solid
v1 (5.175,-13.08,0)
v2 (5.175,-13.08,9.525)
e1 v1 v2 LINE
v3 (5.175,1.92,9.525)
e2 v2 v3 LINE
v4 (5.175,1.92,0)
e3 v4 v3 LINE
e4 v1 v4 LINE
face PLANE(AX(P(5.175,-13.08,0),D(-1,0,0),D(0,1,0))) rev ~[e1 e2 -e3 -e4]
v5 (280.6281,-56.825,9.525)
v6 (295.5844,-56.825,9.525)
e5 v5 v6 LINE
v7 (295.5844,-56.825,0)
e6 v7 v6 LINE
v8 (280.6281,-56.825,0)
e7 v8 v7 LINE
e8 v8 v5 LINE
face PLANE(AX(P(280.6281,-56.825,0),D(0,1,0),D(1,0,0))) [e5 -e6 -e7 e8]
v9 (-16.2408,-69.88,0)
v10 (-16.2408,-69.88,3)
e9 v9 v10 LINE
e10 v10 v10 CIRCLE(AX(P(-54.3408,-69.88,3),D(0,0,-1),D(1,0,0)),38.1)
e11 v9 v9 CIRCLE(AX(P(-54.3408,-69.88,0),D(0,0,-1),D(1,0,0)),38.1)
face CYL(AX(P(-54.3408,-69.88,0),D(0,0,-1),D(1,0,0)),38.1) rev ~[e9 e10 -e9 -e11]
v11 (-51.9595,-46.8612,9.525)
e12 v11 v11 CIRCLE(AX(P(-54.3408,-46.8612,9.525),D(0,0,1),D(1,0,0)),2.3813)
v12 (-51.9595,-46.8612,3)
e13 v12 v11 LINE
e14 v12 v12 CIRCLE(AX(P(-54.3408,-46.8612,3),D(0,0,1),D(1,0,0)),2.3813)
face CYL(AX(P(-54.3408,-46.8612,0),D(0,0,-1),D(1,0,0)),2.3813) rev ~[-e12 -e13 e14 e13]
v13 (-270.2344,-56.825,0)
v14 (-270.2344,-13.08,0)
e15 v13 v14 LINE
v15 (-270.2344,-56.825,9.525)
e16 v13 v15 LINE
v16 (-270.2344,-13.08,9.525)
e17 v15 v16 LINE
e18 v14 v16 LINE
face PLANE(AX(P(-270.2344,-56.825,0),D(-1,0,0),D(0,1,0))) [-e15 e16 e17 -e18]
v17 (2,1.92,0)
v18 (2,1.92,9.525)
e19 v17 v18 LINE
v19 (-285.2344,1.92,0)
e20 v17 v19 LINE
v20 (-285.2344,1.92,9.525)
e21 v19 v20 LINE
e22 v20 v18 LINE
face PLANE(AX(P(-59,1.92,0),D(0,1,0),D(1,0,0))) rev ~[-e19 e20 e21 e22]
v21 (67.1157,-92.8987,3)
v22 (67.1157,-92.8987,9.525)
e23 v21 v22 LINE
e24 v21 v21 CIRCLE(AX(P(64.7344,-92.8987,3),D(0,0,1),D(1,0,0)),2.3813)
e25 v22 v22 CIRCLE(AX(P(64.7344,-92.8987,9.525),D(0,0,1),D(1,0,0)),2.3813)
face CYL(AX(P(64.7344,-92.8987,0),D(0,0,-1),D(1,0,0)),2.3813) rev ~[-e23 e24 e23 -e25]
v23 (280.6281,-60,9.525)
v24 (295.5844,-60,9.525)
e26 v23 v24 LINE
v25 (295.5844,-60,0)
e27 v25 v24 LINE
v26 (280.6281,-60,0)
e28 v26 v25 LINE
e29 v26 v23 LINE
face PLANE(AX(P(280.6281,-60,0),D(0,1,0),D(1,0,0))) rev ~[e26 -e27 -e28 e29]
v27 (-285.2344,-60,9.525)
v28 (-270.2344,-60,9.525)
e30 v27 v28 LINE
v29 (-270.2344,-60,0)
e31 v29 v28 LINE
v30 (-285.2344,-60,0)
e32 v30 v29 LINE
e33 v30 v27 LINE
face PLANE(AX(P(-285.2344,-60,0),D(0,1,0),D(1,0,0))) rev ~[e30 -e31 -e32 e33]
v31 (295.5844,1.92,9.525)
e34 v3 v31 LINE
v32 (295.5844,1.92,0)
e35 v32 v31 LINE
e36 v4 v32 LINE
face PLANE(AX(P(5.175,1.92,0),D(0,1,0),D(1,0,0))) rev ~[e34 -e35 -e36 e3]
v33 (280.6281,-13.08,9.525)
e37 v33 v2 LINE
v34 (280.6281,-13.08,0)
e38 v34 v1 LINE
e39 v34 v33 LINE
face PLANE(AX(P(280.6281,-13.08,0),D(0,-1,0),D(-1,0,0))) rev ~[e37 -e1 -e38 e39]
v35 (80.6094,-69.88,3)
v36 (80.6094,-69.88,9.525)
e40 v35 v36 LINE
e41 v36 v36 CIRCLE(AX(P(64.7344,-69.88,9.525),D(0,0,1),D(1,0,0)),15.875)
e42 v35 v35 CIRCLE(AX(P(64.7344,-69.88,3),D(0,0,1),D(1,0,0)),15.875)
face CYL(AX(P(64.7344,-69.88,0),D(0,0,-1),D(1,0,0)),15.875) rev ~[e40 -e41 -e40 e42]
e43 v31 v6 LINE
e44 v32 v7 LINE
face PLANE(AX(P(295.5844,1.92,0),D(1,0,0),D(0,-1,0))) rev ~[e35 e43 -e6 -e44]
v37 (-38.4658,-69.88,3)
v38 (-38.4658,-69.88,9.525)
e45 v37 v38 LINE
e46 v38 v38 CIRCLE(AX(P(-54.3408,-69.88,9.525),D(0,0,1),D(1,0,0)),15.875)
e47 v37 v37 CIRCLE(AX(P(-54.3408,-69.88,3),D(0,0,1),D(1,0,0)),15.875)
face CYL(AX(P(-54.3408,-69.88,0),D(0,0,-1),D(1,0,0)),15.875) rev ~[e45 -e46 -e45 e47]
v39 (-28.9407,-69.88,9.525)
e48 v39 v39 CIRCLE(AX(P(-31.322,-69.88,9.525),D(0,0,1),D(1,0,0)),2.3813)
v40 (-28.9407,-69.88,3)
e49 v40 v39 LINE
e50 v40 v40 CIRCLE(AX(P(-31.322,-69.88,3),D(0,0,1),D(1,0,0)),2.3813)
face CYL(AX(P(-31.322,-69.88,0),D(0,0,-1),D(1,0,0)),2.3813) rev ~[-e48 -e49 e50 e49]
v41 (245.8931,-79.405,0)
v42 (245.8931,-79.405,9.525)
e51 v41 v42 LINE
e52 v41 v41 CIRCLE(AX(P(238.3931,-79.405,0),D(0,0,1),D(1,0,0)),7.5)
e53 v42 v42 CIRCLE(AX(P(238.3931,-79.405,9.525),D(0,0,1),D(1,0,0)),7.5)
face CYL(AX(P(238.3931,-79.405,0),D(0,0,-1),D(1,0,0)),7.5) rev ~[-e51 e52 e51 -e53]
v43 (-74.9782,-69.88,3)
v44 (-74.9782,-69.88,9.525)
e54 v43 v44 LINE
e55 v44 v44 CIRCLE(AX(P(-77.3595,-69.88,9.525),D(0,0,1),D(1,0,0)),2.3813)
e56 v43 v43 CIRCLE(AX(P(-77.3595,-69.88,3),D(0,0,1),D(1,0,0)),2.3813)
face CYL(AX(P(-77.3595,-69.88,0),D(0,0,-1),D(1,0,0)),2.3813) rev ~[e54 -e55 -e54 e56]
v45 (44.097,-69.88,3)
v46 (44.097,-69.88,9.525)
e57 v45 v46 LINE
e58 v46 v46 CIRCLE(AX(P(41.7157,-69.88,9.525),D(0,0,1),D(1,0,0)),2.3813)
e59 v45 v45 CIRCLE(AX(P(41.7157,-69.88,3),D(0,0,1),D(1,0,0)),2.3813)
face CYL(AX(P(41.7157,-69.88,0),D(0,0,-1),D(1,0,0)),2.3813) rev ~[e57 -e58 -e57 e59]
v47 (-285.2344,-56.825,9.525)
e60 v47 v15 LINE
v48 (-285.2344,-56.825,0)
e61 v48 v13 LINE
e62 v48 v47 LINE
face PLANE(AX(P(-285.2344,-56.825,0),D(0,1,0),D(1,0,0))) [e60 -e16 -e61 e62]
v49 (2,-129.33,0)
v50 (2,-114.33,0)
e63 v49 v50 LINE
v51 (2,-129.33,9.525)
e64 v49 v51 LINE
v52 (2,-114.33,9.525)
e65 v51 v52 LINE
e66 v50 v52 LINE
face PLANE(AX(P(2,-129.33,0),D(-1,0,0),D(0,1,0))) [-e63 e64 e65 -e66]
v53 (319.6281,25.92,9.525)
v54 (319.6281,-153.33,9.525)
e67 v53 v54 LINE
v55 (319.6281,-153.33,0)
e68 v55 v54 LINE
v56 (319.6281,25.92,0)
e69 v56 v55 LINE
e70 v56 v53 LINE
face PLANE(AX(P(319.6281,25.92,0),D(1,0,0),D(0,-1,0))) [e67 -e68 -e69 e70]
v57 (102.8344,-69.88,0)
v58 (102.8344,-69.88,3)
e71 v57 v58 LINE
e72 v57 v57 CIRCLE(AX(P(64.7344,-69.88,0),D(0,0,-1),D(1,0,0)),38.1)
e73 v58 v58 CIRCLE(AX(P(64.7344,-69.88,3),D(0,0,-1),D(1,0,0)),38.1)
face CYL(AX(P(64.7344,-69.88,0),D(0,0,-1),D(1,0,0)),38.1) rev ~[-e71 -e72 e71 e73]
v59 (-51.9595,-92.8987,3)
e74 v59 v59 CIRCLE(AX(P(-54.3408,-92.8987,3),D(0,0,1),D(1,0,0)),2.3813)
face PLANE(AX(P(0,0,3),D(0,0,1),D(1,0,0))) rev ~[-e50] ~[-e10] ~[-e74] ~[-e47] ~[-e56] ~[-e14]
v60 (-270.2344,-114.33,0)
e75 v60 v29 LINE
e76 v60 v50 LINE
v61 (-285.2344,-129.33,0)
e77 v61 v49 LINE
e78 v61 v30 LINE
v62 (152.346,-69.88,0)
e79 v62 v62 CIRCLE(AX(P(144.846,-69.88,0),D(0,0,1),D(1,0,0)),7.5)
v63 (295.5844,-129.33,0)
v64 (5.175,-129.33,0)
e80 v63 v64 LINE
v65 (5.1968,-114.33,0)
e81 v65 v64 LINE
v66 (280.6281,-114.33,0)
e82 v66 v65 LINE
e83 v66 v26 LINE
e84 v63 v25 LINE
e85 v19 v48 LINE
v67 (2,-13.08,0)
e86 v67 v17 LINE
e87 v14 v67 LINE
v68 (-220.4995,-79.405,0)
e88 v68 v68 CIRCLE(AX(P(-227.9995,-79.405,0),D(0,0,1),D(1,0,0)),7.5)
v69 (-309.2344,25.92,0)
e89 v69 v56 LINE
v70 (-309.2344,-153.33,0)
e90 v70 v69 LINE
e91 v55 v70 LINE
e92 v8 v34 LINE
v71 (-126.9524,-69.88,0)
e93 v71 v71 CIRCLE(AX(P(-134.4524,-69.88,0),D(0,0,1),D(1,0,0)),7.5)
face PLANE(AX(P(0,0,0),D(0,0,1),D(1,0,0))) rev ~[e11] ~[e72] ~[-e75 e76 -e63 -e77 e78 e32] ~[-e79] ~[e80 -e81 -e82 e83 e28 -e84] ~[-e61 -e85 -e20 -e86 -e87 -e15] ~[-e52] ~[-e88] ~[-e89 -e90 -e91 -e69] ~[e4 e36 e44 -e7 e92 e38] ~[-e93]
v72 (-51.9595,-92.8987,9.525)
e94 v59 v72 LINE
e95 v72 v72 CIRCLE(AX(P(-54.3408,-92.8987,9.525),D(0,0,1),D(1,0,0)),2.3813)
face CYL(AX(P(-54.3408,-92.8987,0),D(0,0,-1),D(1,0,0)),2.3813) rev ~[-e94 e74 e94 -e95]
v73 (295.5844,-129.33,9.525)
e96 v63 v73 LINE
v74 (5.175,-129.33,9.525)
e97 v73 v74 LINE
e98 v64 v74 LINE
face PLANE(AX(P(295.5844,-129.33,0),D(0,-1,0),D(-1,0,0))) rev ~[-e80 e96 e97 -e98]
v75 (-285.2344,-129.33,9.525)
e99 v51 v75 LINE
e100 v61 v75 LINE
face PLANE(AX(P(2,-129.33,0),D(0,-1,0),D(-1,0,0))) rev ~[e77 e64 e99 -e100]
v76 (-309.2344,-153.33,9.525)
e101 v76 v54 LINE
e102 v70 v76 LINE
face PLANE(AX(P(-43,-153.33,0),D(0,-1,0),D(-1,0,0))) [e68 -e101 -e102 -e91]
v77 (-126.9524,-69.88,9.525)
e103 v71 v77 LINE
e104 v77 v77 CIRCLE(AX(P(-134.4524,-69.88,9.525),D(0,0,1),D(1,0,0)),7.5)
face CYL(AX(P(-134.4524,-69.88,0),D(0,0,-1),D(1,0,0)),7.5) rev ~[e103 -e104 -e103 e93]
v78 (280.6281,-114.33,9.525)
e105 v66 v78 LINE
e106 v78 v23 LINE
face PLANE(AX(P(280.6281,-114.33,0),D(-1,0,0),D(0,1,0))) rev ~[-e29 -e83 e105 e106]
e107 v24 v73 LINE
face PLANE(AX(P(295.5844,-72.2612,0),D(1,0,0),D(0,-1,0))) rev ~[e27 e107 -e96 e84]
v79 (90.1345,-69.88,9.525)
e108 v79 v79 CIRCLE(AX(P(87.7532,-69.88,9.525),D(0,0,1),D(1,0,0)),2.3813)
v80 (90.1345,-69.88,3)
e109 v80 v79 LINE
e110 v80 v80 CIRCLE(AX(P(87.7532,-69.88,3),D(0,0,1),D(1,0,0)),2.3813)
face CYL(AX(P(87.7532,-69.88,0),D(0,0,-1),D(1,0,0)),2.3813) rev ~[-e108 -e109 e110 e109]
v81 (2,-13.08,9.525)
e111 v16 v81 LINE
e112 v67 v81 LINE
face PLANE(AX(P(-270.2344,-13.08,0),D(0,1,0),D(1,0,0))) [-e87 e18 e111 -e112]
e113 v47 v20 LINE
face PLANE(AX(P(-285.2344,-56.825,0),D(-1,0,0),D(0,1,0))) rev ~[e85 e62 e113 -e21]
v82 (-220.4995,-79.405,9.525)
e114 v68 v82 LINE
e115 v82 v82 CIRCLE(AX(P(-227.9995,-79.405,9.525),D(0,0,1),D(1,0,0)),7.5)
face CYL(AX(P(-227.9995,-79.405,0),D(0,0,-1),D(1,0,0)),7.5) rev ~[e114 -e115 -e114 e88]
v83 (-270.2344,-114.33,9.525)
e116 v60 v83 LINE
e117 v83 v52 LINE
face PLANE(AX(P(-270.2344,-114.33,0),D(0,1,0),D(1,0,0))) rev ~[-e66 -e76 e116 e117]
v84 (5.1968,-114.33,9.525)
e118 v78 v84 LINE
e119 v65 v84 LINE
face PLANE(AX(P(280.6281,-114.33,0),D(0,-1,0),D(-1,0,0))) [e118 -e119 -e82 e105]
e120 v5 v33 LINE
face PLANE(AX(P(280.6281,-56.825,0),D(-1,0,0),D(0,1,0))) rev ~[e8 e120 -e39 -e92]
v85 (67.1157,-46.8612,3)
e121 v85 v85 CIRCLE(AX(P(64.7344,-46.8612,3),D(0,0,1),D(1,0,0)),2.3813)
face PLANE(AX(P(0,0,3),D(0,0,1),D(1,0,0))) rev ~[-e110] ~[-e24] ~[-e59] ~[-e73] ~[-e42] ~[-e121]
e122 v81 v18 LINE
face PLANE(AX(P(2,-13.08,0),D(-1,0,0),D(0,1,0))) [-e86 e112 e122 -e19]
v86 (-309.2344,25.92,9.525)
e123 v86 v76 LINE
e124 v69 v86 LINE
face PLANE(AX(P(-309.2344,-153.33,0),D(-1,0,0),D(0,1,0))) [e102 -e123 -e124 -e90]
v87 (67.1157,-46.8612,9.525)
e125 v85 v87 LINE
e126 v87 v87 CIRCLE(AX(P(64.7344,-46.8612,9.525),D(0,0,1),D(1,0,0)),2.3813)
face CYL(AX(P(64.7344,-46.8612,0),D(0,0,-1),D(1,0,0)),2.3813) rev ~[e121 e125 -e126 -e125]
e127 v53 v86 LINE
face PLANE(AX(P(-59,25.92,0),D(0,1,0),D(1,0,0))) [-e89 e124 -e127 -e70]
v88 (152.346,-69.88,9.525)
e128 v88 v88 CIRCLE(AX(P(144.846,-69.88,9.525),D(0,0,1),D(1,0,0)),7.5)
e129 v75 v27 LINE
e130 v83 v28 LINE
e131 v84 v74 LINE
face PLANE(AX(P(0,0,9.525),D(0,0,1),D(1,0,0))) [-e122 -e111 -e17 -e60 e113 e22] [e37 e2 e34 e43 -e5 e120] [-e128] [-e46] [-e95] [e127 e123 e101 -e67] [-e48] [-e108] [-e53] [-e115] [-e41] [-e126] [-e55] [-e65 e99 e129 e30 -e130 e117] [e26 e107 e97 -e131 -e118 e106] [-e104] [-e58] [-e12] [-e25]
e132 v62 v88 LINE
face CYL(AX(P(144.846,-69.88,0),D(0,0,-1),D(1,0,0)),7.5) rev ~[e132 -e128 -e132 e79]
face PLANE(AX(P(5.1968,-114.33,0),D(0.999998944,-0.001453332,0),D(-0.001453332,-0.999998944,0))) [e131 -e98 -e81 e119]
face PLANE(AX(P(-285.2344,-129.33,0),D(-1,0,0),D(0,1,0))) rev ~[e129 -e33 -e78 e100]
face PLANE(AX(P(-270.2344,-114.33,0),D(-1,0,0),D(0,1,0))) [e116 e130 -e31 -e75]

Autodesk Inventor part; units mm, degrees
ref_plane "YZ Plane" through (0, 0, 0) normal (1, 0, 0) x (0, 1, 0)
ref_plane "XZ Plane" through (0, 0, 0) normal (0, 1, 0) x (-1, 0, 0)
ref_plane "XY Plane" through (0, 0, 0) normal (0, 0, 1) x (1, 0, 0)
sketch "Sketch1" plane through (0, 0, 0) normal (0, 0, 1) x (1, 0, 0)
  line L0 (-270.2344, -114.33) -> (-270.2344, -13.08)
  circle A0 centre (-227.9995, -79.405) radius 7.5
  circle A1 centre (-134.4524, -69.88) radius 7.5
  circle A2 centre (-54.3408, -69.88) radius 15.875
  circle A3 centre (-54.3408, -46.8612) radius 2.3813
  circle A4 centre (-31.322, -69.88) radius 2.3813
  circle A5 centre (-77.3595, -69.88) radius 2.3813
  circle A6 centre (-54.3408, -92.8987) radius 2.3813
  line L1 (-270.2344, -13.08) -> (5.175, -13.08)
  line L2 (-270.2344, -114.33) -> (5.1968, -114.33)
  line L3 (280.6281, -114.33) -> (280.6281, -13.08)
  line L4 (280.6281, -13.08) -> (5.175, -13.08)
  line L5 (280.6281, -114.33) -> (5.1968, -114.33)
  line L6 (-285.2344, 1.92) -> (295.5844, 1.92)
  line L7 (295.5844, 1.92) -> (295.5844, -129.33)
  line L8 (295.5844, -129.33) -> (-285.2344, -129.33)
  line L9 (-285.2344, -129.33) -> (-285.2344, 1.92)
  line L10 (-59, 1.92) -> (-59, 25.92)
  line L11 (-285.2344, -38) -> (-309.2344, -38)
  line L12 (-43, -129.33) -> (-43, -153.33)
  line L13 (295.5844, -72.2612) -> (319.5844, -72.2612)
  line L14 (-309.2344, 25.92) -> (319.6281, 25.92)
  line L15 (319.6281, 25.92) -> (319.6281, -153.33)
  line L16 (319.6281, -153.33) -> (-309.2344, -153.33)
  line L17 (-309.2344, -153.33) -> (-309.2344, 25.92)
  line L18 (2, -13.08) -> (2, 1.92)
  line L19 (5.175, -13.08) -> (5.175, 1.92)
  line L20 (2, -129.33) -> (2, -114.33)
  line L21 (-285.2344, -56.825) -> (-270.2344, -56.825)
  line L22 (-285.2344, -60) -> (-270.2344, -60)
  line L23 (280.6281, -56.825) -> (295.5844, -56.825)
  line L24 (5.1968, -114.33) -> (5.175, -129.33)
  line L25 (280.6281, -60) -> (295.5844, -60)
  circle A7 centre (238.3931, -79.405) radius 7.5
  circle A8 centre (144.846, -69.88) radius 7.5
  circle A9 centre (64.7344, -69.88) radius 15.875
  circle A10 centre (64.7344, -46.8612) radius 2.3813
  circle A11 centre (41.7157, -69.88) radius 2.3813
  circle A12 centre (87.7532, -69.88) radius 2.3813
  circle A13 centre (64.7344, -92.8987) radius 2.3813
  circle A14 centre (64.7344, -69.88) radius 38.1
  circle A15 centre (-54.3408, -69.88) radius 38.1
  point P0 (0, 0)
  dimension "d4" = 15
  dimension "d7" = 15
  dimension "d9" = 31.75
  dimension "d11" = 4.7625
  dimension "d13" = 4.7625
  dimension "d15" = 23.0188
  dimension "d16" = 4.7625
  dimension "d18" = 4.7625
  dimension "d25" = 550.8625
  dimension "d30" = 24
  dimension "d31" = 24
  dimension "d32" = 24
  dimension "d33" = 24
  dimension "d34" = 3.175
  dimension "d36" = 3.175
  dimension "d50" = 23.0188
  dimension "d51" = 23.0188
  dimension "d52" = 23.0188
  dimension "d53" = 80.1116
  dimension "d54" = 93.5471
  dimension "d56" = 119.0752
  dimension "d57" = 80.1116
  dimension "d60" = 93.5471
  dimension "d61" = 76.2
  dimension "d62" = 76.2
extrude "Extrusion2" add sketch "Sketch1" along normal blind 9.525 contours L0 L1 L4 L3 L5 L2 | L22 L9 L21 L0 | L2 L24 L8 L20 | L9 L8 L12 L16 L17 L11 | L8 L7 L6 L10 L14 L15 L16 L12 | L18 L6 L19 L1 | L11 L17 L14 L10 L6 L9 | L3 L23 L7 L25 | A14 | A15
emboss "Emboss2" sketch "Sketch1" operation cut depth 3 direction (0, 0, 1) contours A14 | A15
properties part number "side-UPDATED"
